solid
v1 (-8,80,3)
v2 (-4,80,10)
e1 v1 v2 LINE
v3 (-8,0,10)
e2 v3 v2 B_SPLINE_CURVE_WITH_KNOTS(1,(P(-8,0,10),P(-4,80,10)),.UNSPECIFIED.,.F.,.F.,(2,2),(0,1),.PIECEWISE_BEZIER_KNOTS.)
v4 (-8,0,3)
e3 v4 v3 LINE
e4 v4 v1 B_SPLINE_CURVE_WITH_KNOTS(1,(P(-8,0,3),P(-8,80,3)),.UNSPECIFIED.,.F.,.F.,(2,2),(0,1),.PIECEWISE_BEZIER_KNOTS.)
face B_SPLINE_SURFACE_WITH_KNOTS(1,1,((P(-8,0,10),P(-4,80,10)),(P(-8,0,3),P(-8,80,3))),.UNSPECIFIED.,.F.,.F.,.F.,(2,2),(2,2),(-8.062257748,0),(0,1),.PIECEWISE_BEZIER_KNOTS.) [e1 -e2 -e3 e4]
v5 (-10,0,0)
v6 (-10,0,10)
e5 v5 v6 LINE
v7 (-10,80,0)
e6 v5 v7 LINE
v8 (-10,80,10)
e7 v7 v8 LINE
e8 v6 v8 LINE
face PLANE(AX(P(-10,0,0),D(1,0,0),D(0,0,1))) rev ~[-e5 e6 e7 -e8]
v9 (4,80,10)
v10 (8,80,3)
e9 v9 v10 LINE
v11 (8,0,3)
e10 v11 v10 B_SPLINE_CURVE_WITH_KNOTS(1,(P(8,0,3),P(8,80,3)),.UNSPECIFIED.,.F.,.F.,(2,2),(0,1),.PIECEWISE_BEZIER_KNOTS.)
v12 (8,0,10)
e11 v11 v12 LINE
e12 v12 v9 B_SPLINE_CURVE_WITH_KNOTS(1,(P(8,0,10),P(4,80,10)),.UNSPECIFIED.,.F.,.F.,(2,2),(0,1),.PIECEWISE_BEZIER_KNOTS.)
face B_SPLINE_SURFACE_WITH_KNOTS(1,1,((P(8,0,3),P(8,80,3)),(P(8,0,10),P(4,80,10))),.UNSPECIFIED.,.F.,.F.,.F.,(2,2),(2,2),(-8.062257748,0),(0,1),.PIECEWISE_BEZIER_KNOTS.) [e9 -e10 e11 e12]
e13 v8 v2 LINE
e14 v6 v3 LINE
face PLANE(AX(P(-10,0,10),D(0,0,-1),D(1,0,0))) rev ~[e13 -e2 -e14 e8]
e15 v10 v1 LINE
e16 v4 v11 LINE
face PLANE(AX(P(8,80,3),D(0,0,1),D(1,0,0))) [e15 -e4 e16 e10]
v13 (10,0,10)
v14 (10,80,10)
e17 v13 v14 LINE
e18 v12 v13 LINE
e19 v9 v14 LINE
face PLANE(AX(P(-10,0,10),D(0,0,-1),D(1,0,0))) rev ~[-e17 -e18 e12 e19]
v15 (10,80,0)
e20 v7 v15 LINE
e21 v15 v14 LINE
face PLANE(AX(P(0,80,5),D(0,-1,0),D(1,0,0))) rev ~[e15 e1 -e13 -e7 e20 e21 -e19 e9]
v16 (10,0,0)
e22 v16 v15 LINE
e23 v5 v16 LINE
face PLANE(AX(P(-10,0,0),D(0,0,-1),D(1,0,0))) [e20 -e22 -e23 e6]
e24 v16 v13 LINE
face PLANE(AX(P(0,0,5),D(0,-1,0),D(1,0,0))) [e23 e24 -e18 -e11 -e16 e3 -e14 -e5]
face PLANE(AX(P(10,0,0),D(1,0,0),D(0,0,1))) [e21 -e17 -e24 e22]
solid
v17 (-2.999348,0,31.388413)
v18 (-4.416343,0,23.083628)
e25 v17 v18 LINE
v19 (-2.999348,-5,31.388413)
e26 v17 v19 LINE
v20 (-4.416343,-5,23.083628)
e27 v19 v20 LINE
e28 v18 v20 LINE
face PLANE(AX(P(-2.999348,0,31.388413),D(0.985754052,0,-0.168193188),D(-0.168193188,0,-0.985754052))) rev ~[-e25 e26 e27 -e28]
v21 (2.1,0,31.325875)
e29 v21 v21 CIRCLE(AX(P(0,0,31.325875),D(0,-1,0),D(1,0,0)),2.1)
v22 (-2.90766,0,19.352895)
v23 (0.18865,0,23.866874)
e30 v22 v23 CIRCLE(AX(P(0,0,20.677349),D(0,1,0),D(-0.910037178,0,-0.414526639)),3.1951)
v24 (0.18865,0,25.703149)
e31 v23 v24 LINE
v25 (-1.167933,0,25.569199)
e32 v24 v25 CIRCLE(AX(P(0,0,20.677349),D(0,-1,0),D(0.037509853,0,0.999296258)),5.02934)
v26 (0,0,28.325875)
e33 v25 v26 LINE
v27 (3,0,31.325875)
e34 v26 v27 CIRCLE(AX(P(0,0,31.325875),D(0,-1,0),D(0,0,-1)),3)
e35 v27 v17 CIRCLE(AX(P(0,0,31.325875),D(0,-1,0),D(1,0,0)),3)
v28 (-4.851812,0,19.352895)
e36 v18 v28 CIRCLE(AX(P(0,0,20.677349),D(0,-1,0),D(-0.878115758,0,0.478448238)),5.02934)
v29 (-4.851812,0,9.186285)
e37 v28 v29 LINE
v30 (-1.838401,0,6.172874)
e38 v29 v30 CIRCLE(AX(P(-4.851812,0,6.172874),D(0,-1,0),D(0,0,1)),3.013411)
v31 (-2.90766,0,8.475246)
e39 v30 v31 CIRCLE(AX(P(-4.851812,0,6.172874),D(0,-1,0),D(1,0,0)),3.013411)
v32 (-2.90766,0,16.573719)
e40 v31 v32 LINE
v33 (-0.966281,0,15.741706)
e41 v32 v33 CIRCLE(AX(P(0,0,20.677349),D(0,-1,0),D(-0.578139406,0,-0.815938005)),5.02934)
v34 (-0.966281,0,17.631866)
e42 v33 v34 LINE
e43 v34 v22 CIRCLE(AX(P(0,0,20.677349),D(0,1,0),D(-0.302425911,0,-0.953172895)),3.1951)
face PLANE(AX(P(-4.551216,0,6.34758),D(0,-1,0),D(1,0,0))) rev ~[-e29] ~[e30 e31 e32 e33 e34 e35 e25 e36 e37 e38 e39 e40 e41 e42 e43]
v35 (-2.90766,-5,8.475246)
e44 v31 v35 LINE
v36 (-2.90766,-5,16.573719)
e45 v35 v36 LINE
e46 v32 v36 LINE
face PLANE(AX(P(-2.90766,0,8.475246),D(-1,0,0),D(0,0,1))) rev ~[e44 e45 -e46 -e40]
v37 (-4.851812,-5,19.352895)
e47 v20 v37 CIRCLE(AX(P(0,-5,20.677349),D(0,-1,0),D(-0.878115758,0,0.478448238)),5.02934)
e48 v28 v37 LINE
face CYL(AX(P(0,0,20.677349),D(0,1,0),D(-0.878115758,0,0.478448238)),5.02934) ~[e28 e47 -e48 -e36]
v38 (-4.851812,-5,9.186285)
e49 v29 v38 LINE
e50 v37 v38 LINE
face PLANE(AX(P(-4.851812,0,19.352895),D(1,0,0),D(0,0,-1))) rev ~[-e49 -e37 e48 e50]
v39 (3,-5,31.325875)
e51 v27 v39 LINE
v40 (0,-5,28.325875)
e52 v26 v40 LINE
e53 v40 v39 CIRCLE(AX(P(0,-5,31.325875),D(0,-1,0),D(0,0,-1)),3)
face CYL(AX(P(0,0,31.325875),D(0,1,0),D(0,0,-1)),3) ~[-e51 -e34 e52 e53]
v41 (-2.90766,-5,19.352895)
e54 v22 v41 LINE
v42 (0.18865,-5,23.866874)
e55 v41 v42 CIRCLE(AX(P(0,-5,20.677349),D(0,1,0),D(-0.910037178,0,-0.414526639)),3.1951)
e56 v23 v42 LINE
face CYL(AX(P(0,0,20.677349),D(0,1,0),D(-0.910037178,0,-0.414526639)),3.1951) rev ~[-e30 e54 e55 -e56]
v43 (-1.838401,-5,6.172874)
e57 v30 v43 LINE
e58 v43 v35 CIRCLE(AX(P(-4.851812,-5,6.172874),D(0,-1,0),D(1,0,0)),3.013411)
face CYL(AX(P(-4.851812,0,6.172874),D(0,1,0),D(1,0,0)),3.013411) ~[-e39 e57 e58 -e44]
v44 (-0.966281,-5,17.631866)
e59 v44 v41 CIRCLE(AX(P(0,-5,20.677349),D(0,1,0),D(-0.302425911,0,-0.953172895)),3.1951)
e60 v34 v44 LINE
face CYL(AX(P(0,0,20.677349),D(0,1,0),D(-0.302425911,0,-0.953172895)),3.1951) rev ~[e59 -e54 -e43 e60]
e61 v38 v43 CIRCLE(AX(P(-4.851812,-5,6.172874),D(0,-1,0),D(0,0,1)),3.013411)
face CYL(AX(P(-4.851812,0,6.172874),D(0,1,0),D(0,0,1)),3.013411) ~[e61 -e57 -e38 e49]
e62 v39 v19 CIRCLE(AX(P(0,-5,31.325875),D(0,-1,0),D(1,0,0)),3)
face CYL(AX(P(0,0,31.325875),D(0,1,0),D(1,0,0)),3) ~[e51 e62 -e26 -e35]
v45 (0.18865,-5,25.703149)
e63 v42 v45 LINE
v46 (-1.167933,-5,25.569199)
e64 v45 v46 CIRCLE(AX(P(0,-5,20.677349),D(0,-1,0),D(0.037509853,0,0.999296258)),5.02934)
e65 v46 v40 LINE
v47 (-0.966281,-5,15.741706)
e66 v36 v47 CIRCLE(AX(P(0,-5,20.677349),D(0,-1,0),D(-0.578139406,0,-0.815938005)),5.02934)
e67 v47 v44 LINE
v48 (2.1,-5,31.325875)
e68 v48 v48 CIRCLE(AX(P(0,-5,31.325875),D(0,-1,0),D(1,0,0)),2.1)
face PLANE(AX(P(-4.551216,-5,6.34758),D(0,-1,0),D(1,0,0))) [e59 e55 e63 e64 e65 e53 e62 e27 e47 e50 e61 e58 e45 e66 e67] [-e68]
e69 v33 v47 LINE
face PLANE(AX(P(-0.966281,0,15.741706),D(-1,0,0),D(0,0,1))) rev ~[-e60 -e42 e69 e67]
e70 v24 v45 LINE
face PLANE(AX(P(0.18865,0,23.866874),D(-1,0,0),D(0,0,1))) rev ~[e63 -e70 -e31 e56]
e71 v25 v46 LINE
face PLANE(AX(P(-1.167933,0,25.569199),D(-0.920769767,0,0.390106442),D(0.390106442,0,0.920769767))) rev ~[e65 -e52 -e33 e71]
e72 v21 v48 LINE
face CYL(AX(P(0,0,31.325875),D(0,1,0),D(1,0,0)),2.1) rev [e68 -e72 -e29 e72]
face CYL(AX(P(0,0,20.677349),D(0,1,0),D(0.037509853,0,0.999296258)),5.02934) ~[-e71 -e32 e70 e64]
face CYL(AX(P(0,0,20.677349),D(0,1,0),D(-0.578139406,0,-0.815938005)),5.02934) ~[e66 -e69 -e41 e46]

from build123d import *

# Parameters (mm, degrees)
F0_W     = 20
F0_H     = 10
F1_DEPTH = 80
F2_W     = 16
F2_H     = 7
F5_R     = 2.1
F6_DEPTH = 5


with BuildPart() as f1:
    # F0 (on Front) → F1 (new body)
    with BuildSketch(Plane.XZ):
        with Locations((0, 5)):
            Rectangle(F0_W, F0_H)
    extrude(amount=-F1_DEPTH)

    # F2 (on face) → F4 section 0
    with BuildSketch(Plane.XZ):
        with Locations((0, 6.5)):
            Rectangle(F2_W, F2_H)
    # F3 (on face) → F4 section 1
    with BuildSketch(Plane(origin=(0, 80, 0), x_dir=(-1, 0, 0), z_dir=(0, 1, 0))):
        Polygon((4, 10), (-4, 10), (-8, 3), (8, 3), align=None)
    loft(mode=Mode.SUBTRACT)


with BuildPart() as f6:
    # F5 (on Front) → F6 (new body)
    with BuildSketch(Plane.XZ):
        with BuildLine():
            Line((-4.8518124968, 6.1728735454), (-4.8518124968, 9.1862847298))
            ThreePointArc((-4.8518124968, 9.1862847298), (-6.9826159798, 4.0420700624), (-1.8384013124, 6.1728735454))
            ThreePointArc((-1.8384013124, 6.1728735454), (-2.118757562, 7.4421480192), (-2.9076597649, 8.4752456095))
            Line((-2.9076597649, 8.4752456095), (-2.9076597649, 6.1728735454))
            Line((-2.9076597649, 6.1728735454), (-4.8518124968, 6.1728735454))
        make_face()
        with BuildLine():
            ThreePointArc((-2.9076597649, 8.4752456095), (-3.8167634067, 9.0029478108), (-4.8518124968, 9.1862847298))
            Line((-4.8518124968, 9.1862847298), (-4.8518124968, 6.1728735454))
            Line((-4.8518124968, 6.1728735454), (-2.9076597649, 6.1728735454))
            Line((-2.9076597649, 6.1728735454), (-2.9076597649, 8.4752456095))
        make_face()
        with BuildLine():
            ThreePointArc((-2.9076597649, 16.5737187745), (-4.1210807971, 17.7944757075), (-4.8518124968, 19.3528945454))
            Line((-4.8518124968, 19.3528945454), (-4.8518124968, 9.1862847298))
            ThreePointArc((-4.8518124968, 9.1862847298), (-3.8167634067, 9.0029478108), (-2.9076597649, 8.4752456095))
            Line((-2.9076597649, 8.4752456095), (-2.9076597649, 16.5737187745))
        make_face()
        with BuildLine():
            ThreePointArc((-0.9662810217, 17.6318659056), (-2.1195139064, 18.2864649445), (-2.9076597649, 19.3528945454))
            Line((-2.9076597649, 19.3528945454), (-2.9076597649, 16.5737187745))
            ThreePointArc((-2.9076597649, 16.5737187745), (-1.9811399388, 16.0546494321), (-0.9662810217, 15.7417063883))
            Line((-0.9662810217, 15.7417063883), (-0.9662810217, 17.6318659056))
        make_face()
        with BuildLine():
            Line((-2.9076597649, 19.3528945454), (-4.8518124968, 19.3528945454))
            ThreePointArc((-4.8518124968, 19.3528945454), (-4.1210807971, 17.7944757075), (-2.9076597649, 16.5737187745))
            Line((-2.9076597649, 16.5737187745), (-2.9076597649, 19.3528945454))
        make_face()
        with BuildLine():
            ThreePointArc((-1.1679330145, 25.5691985063), (-3.0562313548, 24.6715585269), (-4.4163428976, 23.0836275632))
            ThreePointArc((-4.4163428976, 23.0836275632), (-4.9954247383, 21.2604392671), (-4.8518124968, 19.3528945454))
            Line((-4.8518124968, 19.3528945454), (-2.9076597649, 19.3528945454))
            ThreePointArc((-2.9076597649, 19.3528945454), (-2.634816389, 22.4846688372), (0.1886498126, 23.8668744407))
            Line((0.1886498126, 23.8668744407), (0.1886498126, 25.7031494596))
            ThreePointArc((0.1886498126, 25.7031494596), (-0.4942009833, 25.6823489417), (-1.1679330145, 25.5691985063))
        make_face()
        with BuildLine():
            ThreePointArc((0, 28.3258753854), (-2.1433167436, 29.2267819295), (-2.9993481003, 31.388413161))
            Line((-2.9993481003, 31.388413161), (-4.4163428976, 23.0836275632))
            ThreePointArc((-4.4163428976, 23.0836275632), (-3.0562313548, 24.6715585269), (-1.1679330145, 25.5691985063))
            Line((-1.1679330145, 25.5691985063), (0, 28.3258753854))
        make_face()
        with BuildLine():
            ThreePointArc((0, 28.3258753854), (2.1213203436, 29.2045550419), (3, 31.3258753854))
            ThreePointArc((3, 31.3258753854), (0.0312705866, 34.3257124061), (-2.9993481003, 31.388413161))
            ThreePointArc((-2.9993481003, 31.388413161), (-2.1433167436, 29.2267819295), (0, 28.3258753854))
        make_face()
        with Locations((0, 31.3258753854)):
            Circle(F5_R, mode=Mode.SUBTRACT)
    extrude(amount=F6_DEPTH)


solid = Compound([f1.part, f6.part])
